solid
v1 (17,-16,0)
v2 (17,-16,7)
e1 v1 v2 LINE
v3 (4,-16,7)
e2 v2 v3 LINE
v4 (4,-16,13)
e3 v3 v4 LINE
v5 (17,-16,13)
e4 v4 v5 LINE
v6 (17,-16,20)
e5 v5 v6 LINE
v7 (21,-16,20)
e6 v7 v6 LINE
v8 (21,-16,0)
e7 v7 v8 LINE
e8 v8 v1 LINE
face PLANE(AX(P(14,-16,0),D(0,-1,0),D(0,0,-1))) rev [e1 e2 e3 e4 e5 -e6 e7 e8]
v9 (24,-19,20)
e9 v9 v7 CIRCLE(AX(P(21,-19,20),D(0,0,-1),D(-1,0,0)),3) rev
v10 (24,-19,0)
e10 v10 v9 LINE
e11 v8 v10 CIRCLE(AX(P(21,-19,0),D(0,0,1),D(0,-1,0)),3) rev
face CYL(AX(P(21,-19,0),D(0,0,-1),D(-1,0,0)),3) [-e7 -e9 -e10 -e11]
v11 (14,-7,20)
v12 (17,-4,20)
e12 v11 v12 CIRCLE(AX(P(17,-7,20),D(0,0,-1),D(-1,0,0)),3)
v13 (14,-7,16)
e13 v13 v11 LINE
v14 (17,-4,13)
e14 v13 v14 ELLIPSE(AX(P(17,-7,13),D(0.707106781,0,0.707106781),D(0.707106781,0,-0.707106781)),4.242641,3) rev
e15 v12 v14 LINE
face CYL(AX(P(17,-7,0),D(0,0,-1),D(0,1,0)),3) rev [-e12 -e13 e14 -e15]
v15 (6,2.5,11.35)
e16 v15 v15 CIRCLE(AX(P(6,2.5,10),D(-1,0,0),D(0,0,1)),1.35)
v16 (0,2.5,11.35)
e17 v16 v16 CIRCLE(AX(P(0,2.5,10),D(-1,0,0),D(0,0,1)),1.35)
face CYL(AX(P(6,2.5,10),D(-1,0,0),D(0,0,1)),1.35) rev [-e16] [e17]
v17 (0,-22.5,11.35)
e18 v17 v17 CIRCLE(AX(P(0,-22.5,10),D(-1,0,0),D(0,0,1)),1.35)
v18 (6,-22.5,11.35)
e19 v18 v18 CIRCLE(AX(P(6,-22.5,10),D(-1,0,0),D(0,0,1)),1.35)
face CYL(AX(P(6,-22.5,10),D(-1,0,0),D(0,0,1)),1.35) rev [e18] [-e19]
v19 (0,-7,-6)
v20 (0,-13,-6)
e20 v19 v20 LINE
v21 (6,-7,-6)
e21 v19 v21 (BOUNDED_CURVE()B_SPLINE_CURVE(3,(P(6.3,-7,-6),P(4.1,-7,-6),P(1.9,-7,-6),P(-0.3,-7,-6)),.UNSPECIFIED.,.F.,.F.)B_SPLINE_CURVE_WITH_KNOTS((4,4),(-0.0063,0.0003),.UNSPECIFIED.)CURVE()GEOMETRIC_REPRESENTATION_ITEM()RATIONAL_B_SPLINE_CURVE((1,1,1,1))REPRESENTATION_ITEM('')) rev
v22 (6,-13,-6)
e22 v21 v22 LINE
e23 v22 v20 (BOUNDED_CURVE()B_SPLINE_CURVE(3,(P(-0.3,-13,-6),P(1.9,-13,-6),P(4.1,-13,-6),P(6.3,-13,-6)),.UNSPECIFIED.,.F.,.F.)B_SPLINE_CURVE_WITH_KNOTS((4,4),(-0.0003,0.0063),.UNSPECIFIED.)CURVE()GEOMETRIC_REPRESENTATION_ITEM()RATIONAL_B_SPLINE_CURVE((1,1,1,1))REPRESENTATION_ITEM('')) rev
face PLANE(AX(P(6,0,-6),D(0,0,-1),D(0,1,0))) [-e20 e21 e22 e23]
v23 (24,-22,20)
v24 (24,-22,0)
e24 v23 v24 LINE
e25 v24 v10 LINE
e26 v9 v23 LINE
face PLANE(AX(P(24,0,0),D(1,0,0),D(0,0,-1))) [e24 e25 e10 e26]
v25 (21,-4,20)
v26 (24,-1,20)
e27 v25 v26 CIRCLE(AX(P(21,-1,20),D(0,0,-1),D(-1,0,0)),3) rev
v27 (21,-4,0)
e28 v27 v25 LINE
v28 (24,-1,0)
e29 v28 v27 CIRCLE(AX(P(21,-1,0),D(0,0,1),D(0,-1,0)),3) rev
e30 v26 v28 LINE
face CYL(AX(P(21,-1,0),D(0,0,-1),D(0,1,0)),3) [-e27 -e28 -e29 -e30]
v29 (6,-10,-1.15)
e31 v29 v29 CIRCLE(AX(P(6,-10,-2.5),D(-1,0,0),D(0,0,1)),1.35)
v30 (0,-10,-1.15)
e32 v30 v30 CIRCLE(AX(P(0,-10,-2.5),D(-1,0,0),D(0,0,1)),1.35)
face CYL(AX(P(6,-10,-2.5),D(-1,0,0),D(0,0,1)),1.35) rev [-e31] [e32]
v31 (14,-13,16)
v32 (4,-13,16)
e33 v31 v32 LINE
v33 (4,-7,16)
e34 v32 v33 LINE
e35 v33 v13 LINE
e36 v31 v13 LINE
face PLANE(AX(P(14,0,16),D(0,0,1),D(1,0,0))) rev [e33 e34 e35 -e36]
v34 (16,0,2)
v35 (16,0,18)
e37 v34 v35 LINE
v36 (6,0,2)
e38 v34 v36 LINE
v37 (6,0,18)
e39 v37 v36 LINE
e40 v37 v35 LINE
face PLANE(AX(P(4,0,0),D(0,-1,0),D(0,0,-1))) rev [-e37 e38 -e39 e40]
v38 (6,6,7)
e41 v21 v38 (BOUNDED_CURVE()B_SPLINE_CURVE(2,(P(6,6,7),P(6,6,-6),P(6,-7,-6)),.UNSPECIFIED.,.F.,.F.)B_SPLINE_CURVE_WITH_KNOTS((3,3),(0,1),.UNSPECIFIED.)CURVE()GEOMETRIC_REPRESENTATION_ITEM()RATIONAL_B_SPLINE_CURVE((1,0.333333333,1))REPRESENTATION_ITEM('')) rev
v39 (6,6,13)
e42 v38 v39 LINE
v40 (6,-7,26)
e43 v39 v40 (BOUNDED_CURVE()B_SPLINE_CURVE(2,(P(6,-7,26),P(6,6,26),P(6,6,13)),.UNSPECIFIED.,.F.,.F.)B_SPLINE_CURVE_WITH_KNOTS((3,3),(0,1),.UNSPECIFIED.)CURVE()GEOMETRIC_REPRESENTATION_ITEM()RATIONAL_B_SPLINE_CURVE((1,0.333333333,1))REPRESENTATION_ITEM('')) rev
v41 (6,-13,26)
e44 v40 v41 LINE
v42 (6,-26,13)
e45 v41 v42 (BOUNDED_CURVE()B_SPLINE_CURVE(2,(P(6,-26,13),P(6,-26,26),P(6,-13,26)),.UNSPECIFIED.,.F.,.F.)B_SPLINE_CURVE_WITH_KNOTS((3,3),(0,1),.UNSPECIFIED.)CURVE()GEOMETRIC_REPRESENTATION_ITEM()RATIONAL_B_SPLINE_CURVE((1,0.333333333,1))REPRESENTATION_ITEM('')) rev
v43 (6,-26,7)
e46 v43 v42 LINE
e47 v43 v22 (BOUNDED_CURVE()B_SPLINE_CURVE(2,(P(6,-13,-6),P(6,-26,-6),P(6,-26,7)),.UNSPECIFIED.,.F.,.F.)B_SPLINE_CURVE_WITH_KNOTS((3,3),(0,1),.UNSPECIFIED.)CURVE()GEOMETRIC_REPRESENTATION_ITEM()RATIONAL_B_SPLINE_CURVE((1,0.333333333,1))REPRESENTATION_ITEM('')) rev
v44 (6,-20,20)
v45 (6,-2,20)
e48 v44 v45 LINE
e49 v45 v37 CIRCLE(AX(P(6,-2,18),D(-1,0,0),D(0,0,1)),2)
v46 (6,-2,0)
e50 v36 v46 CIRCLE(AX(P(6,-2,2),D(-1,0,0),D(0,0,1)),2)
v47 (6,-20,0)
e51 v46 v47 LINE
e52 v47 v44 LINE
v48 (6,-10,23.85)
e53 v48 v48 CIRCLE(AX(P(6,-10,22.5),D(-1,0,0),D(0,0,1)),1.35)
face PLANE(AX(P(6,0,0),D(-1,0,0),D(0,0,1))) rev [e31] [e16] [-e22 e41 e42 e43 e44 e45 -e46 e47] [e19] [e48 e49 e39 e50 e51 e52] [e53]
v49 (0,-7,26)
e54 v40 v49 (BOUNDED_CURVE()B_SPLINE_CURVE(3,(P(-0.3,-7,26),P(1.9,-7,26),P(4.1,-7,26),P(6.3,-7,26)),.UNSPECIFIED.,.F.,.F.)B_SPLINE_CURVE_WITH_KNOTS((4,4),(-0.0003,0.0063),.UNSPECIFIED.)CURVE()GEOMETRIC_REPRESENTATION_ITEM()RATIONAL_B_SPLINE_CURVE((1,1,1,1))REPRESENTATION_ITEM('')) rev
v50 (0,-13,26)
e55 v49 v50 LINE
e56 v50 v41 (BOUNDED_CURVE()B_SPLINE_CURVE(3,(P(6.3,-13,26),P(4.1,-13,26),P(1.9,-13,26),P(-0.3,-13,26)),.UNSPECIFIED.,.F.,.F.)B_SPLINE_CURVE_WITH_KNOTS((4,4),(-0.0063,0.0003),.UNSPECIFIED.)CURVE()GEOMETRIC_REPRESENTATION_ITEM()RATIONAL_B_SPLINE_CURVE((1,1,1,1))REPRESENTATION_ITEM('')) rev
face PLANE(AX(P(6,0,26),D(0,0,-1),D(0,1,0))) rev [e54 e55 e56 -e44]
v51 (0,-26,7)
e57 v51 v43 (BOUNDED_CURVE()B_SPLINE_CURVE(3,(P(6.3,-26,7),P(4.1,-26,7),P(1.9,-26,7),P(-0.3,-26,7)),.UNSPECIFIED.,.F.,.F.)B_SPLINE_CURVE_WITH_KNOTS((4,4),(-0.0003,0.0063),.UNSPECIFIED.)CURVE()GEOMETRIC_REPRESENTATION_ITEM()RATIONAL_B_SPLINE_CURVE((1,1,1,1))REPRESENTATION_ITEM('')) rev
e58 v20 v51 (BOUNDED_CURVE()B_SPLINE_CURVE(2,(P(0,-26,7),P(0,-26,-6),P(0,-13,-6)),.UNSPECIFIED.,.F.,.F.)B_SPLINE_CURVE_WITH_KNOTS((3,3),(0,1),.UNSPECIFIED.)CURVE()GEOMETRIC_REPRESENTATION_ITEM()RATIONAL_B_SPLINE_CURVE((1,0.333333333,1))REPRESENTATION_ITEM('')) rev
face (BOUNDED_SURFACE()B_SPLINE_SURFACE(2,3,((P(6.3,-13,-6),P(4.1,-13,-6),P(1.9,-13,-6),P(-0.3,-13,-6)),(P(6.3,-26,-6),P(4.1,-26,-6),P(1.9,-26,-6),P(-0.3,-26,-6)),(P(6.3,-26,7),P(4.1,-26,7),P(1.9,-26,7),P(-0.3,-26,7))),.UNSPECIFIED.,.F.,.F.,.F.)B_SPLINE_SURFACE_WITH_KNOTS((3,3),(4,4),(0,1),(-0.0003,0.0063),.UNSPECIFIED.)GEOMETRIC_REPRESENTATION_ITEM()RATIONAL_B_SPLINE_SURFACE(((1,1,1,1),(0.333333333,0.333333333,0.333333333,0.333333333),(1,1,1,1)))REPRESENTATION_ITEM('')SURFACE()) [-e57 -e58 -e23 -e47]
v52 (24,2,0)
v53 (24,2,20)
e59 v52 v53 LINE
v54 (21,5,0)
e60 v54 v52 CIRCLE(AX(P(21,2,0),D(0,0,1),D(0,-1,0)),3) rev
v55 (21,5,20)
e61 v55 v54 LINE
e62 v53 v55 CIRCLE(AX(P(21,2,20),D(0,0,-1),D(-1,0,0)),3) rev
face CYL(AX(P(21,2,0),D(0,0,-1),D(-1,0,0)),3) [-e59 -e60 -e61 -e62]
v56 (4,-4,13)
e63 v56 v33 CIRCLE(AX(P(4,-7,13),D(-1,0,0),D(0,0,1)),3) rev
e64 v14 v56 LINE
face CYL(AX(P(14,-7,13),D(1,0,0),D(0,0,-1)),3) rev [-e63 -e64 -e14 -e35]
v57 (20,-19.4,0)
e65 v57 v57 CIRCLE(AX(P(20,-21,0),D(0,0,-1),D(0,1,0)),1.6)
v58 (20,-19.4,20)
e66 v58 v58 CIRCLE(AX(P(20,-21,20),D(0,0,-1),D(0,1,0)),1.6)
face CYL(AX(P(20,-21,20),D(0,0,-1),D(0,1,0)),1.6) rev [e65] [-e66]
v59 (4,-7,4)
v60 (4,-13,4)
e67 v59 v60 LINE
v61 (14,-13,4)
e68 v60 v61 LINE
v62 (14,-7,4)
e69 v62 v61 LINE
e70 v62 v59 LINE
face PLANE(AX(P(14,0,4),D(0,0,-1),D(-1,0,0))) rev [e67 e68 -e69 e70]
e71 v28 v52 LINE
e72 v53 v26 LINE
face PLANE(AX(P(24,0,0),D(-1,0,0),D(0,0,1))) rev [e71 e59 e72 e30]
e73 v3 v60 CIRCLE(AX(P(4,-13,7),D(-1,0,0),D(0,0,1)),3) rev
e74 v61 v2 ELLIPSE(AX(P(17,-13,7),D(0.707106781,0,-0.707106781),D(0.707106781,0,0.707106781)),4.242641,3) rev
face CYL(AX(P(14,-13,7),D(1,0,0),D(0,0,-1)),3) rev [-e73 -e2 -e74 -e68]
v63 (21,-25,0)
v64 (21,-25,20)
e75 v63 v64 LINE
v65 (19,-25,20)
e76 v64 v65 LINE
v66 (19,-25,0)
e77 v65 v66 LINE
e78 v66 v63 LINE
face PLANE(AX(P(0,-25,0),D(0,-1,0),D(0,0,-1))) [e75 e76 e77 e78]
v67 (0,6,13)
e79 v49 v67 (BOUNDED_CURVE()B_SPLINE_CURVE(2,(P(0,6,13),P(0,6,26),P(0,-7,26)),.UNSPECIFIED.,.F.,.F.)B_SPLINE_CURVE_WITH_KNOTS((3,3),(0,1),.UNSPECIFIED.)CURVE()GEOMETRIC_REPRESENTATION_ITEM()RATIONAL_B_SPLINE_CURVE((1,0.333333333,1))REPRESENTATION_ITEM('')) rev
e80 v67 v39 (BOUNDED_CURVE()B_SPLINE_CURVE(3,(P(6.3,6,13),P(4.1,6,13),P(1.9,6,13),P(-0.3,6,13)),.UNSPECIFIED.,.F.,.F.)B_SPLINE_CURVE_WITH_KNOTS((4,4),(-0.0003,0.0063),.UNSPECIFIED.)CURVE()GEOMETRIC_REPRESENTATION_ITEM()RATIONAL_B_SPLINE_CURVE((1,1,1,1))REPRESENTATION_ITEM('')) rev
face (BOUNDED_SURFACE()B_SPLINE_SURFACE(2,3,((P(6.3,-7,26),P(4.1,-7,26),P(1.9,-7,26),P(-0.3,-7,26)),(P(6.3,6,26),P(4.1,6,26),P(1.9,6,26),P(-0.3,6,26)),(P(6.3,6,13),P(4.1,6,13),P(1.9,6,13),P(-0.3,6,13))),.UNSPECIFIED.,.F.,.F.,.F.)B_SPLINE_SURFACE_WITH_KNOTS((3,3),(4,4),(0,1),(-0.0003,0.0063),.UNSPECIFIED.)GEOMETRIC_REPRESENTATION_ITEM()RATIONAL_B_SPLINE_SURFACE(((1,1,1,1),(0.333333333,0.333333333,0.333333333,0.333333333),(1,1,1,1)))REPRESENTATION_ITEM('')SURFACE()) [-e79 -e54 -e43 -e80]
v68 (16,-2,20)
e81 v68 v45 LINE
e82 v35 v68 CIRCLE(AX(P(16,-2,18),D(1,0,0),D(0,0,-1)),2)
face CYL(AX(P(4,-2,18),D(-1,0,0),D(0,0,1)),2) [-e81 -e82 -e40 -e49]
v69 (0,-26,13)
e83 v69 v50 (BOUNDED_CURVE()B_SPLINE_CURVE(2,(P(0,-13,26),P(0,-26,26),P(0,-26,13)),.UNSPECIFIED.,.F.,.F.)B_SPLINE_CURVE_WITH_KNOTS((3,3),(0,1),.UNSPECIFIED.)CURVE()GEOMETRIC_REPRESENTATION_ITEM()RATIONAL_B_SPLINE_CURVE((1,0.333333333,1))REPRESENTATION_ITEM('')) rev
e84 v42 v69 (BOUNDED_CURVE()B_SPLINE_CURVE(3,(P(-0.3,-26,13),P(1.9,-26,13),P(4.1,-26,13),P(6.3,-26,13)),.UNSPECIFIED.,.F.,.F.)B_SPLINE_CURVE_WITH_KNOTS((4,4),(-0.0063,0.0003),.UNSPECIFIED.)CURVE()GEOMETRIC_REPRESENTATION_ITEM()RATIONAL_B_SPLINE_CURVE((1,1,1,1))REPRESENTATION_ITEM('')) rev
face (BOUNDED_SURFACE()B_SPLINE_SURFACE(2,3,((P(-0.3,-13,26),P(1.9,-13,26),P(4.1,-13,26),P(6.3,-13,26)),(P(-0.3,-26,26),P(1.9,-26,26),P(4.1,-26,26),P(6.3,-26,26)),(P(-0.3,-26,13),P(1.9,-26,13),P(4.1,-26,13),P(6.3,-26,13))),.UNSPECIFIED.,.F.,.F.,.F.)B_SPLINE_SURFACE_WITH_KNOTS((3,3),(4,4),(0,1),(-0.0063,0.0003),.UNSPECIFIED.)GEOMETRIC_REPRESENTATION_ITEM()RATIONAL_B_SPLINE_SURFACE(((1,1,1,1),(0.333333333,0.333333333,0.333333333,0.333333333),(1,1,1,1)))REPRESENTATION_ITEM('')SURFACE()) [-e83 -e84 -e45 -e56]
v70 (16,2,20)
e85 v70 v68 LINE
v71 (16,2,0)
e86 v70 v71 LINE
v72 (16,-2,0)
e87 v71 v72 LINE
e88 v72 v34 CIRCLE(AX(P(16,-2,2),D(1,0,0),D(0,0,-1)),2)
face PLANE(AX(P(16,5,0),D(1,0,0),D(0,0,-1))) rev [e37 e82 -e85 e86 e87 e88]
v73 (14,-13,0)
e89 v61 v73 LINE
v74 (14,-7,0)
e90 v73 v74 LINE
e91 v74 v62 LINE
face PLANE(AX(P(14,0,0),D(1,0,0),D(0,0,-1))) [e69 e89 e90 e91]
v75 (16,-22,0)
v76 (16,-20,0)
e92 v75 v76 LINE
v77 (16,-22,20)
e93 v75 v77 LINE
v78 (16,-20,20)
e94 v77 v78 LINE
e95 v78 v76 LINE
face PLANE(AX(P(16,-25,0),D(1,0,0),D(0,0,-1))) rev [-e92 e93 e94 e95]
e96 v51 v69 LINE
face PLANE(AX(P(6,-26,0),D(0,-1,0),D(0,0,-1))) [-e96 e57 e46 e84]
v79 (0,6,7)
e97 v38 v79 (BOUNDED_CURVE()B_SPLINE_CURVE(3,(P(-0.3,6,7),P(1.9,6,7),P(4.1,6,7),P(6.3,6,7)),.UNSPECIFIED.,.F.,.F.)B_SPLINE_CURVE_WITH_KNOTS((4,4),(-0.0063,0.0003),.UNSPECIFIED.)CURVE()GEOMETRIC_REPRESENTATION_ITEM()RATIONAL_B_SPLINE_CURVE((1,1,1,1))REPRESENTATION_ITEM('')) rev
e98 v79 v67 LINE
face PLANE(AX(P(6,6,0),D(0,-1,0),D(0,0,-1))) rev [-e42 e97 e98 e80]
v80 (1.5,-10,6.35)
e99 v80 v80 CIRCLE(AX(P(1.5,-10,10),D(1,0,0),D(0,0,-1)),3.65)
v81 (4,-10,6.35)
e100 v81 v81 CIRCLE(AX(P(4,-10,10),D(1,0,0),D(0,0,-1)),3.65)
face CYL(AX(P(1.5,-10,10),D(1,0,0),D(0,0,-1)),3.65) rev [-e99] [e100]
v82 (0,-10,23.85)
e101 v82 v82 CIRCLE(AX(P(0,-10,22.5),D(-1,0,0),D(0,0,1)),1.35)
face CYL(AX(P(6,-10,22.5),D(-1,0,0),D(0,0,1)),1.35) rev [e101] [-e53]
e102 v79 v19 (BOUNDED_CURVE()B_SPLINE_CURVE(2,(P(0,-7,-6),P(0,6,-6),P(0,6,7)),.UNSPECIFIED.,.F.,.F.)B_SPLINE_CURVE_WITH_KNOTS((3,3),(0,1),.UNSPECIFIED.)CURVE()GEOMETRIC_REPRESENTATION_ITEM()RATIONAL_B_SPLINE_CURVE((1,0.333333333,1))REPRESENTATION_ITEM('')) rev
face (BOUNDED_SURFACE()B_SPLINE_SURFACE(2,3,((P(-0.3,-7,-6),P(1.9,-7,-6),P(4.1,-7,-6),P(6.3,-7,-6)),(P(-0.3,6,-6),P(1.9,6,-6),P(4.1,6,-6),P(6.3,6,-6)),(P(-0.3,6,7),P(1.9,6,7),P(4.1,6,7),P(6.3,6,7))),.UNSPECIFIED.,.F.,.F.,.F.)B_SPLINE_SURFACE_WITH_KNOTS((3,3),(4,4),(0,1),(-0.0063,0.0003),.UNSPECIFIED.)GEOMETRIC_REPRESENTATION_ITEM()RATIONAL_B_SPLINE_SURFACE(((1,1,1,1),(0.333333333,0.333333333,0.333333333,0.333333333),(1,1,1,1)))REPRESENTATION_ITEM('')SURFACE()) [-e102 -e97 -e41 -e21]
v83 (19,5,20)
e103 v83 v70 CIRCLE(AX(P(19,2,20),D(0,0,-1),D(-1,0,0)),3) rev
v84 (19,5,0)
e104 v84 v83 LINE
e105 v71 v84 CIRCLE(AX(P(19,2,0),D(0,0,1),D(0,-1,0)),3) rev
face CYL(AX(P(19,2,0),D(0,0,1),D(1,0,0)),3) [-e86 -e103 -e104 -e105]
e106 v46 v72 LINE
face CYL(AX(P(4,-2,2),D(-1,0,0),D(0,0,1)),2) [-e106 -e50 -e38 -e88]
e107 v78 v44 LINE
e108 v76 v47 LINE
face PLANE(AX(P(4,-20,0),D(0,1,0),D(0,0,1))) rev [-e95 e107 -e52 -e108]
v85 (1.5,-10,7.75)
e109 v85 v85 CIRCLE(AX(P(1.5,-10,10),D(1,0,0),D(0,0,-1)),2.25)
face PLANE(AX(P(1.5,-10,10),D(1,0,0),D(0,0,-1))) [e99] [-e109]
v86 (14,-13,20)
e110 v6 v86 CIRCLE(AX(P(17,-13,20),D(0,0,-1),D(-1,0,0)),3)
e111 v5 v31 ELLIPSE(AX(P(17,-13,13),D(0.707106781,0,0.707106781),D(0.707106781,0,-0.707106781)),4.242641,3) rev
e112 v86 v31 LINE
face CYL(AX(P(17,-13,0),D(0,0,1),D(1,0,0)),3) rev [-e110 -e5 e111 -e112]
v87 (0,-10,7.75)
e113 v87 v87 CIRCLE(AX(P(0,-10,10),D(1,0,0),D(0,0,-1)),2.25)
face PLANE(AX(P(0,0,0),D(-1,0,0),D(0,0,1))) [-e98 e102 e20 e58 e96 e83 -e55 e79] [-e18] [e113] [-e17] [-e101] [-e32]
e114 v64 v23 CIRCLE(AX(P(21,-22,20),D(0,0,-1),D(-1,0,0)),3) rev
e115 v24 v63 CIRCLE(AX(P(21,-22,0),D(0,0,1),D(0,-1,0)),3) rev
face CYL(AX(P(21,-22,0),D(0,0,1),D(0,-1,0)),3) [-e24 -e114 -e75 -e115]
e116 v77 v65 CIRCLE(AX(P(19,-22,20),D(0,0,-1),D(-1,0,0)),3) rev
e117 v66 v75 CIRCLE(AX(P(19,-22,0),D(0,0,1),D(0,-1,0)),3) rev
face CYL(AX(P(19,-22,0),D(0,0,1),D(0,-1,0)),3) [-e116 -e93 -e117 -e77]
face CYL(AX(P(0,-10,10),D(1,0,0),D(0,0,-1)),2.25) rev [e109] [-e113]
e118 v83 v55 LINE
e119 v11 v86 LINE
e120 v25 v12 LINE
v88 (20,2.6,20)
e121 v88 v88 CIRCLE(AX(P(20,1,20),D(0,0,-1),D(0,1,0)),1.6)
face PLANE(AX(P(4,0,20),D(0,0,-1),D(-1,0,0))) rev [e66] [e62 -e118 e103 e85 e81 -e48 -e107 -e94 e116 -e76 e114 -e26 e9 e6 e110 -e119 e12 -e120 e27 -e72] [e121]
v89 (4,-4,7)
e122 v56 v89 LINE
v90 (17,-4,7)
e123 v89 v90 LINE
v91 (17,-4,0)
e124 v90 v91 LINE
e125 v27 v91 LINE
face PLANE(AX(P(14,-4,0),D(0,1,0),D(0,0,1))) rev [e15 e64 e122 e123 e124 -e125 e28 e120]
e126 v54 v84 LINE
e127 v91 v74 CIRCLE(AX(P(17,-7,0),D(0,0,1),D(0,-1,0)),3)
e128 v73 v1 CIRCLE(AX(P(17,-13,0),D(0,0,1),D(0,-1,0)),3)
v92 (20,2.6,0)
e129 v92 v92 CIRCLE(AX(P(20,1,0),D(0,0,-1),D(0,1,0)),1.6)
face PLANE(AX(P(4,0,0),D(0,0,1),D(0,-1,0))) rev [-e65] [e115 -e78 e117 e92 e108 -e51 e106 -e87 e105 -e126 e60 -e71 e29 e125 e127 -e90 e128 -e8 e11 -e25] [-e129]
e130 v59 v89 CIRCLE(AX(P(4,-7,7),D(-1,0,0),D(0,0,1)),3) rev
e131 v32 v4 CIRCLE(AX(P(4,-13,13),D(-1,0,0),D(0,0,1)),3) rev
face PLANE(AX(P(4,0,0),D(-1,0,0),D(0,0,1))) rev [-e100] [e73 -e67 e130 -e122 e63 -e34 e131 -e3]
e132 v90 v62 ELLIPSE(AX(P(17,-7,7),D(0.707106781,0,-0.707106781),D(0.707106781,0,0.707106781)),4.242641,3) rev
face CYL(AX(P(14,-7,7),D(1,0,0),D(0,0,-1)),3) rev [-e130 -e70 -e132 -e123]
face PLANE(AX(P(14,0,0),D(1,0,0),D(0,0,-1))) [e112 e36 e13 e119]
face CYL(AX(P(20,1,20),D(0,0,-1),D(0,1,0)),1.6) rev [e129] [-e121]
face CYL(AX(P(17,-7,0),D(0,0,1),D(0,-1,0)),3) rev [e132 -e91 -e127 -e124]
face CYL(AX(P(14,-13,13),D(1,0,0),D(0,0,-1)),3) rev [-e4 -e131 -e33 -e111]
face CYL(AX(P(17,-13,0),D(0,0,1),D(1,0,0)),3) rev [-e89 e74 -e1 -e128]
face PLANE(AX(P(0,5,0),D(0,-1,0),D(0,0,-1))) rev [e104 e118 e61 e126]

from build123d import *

# Parameters (mm, degrees)
SKETCH1_W           = 20
SKETCH1_H           = 20
BOSS_EXTRUDE1_DEPTH = 4
SKETCH2_R           = 3.65
CUT_EXTRUDE1_DEPTH  = 2.5
SKETCH3_R           = 2.25
CUT_EXTRUDE2_DEPTH  = 29.394541729
SKETCH4_W           = 12
SKETCH4_H           = 4
BOSS_EXTRUDE2_DEPTH = 10
SKETCH7_W           = 20
SKETCH7_H           = 4
BOSS_EXTRUDE3_DEPTH = 10
SKETCH8_W           = 8
SKETCH8_H           = 20
BOSS_EXTRUDE4_DEPTH = 5
SKETCH9_W           = 8
SKETCH9_H           = 20
BOSS_EXTRUDE5_DEPTH = 5
SKETCH10_R          = 1.6
CUT_EXTRUDE5_DEPTH  = 41.012498047
SKETCH11_W          = 32
SKETCH11_H          = 32
SKETCH11_W_2        = 20
SKETCH11_H_2        = 20
BOSS_EXTRUDE6_DEPTH = 6
FILLET6_R           = 3
SKETCH13_R          = 1.35
CUT_EXTRUDE7_DEPTH  = 6
FILLET7_R           = 3
FILLET13_R          = 2
FILLET14_SIZE       = 13


with BuildPart() as part:
    # Sketch1 → Boss-Extrude1 (new body)
    with BuildSketch(Plane(origin=(0, 0, 0), x_dir=(0, 0, -1), z_dir=(1, 0, 0))):
        with Locations((-10, -10)):
            Rectangle(SKETCH1_W, SKETCH1_H)
    extrude(amount=BOSS_EXTRUDE1_DEPTH)

    # Sketch2 → Cut-Extrude1 (cut)
    with BuildSketch(Plane(origin=(4, 0, 0), x_dir=(0, 0, -1), z_dir=(1, 0, 0))):
        with Locations((-10, -10)):
            Circle(SKETCH2_R)
    extrude(amount=-CUT_EXTRUDE1_DEPTH, mode=Mode.SUBTRACT)

    # Sketch3 → Cut-Extrude2 (cut, through all)
    with BuildSketch(Plane(origin=(1.5, 0, 0), x_dir=(0, 0, -1), z_dir=(1, 0, 0))):
        with Locations((-10, -10)):
            Circle(SKETCH3_R)
    extrude(amount=-CUT_EXTRUDE2_DEPTH, mode=Mode.SUBTRACT)

    # Sketch4 → Boss-Extrude2 (add)
    with BuildSketch(Plane(origin=(4, 0, 0), x_dir=(0, 0, -1), z_dir=(1, 0, 0))):
        Polygon((-20, 0), (-20, -20), (-16, -20), (-16, -16), (-16, -4), (-16, 0), align=None)
        with Locations((-10, -18)):
            Rectangle(SKETCH4_W, SKETCH4_H)
        Polygon((-4, -16), (-4, -20), (0, -20), (0, -4), (-4, -4), align=None)
        Polygon((0, 0), (-16, 0), (-16, -4), (-4, -4), (0, -4), align=None)
    extrude(amount=BOSS_EXTRUDE2_DEPTH)

    # Sketch7 → Boss-Extrude3 (add)
    with BuildSketch(Plane(origin=(14, 0, 0), x_dir=(0, 0, -1), z_dir=(1, 0, 0))):
        with Locations((-10, -18)):
            Rectangle(SKETCH7_W, SKETCH7_H)
        with Locations((-10, -2)):
            Rectangle(SKETCH7_W, SKETCH7_H)
    extrude(amount=BOSS_EXTRUDE3_DEPTH)

    # Sketch8 → Boss-Extrude4 (add)
    with BuildSketch(Plane(origin=(0, -20, 0), x_dir=(-1, 0, 0), z_dir=(0, -1, 0))):
        with Locations((-20, -10)):
            Rectangle(SKETCH8_W, SKETCH8_H)
    extrude(amount=BOSS_EXTRUDE4_DEPTH)

    # Sketch9 → Boss-Extrude5 (add)
    with BuildSketch(Plane(origin=(0, 0, 0), x_dir=(1, 0, 0), z_dir=(0, 1, 0))):
        with Locations((20, -10)):
            Rectangle(SKETCH9_W, SKETCH9_H)
    extrude(amount=BOSS_EXTRUDE5_DEPTH)

    # Sketch10 → Cut-Extrude5 (cut, through all)
    with BuildSketch(Plane(origin=(0, 0, 0), x_dir=(-1, 0, 0), z_dir=(0, 0, -1))):
        with Locations(Location((-20, 1, 0), (0, 0, 90))):
            Circle(SKETCH10_R)
        with Locations(Location((-20, -21, 0), (0, 0, 90))):
            Circle(SKETCH10_R)
    extrude(amount=-CUT_EXTRUDE5_DEPTH, mode=Mode.SUBTRACT)

    # Sketch11 → Boss-Extrude6 (add)
    with BuildSketch(Plane.ZY):
        with Locations((10, -10)):
            Rectangle(SKETCH11_W, SKETCH11_H)
        with Locations((10, -10)):
            Rectangle(SKETCH11_W_2, SKETCH11_H_2, mode=Mode.SUBTRACT)
    extrude(amount=-BOSS_EXTRUDE6_DEPTH)

    # Fillet6
    fillet6_edges = [part.edges().sort_by_distance(p)[0] for p in [
        (24, -16, 10),
        (24, -4, 10),
        (24, -25, 10),
        (16, -25, 10),
        (24, 5, 10),
        (16, 5, 10),
    ]]
    fillet(fillet6_edges, radius=FILLET6_R)

    # Sketch13 → Cut-Extrude7 (cut)
    with BuildSketch(Plane.ZY):
        with Locations((22.5, -10)):
            Circle(SKETCH13_R)
        with Locations((10, 2.5)):
            Circle(SKETCH13_R)
        with Locations((-2.5, -10)):
            Circle(SKETCH13_R)
        with Locations((10, -22.5)):
            Circle(SKETCH13_R)
    extrude(amount=-CUT_EXTRUDE7_DEPTH, mode=Mode.SUBTRACT)

    # Fillet7
    fillet7_edges = [part.edges().sort_by_distance(p)[0] for p in [
        (9, -4, 16),
        (9, -4, 4),
        (9, -16, 4),
        (9, -16, 16),
        (14, -16, 18),
        (14, -16, 2),
        (14, -4, 2),
        (14, -4, 18),
    ]]
    fillet(fillet7_edges, radius=FILLET7_R)

    # Fillet13
    fillet13_edges = [part.edges().sort_by_distance(p)[0] for p in [
        (11, 0, 20),
        (11, 0, 0),
    ]]
    fillet(fillet13_edges, radius=FILLET13_R)

    # Fillet14
    # a fillet whose section is not a circle: 13 mm, written as the material it takes off along each edge
    with BuildSketch(Plane(origin=(0, -26, -6), x_dir=(0, 1, 0), z_dir=(1, 0, 0)), Plane(origin=(0, -26, 26), x_dir=(0, 0, -1), z_dir=(1, 0, 0))) as fillet14_piece_1:
        with BuildLine():
            Bezier((FILLET14_SIZE, 0), (0, 0), (0, FILLET14_SIZE), weights=[1, 0.333333333, 1])
            Line((0, FILLET14_SIZE), (-FILLET14_SIZE * 0.02, FILLET14_SIZE))
            Line((-FILLET14_SIZE * 0.02, FILLET14_SIZE), (-FILLET14_SIZE * 0.02, -FILLET14_SIZE * 0.02))
            Line((-FILLET14_SIZE * 0.02, -FILLET14_SIZE * 0.02), (FILLET14_SIZE, -FILLET14_SIZE * 0.02))
            Line((FILLET14_SIZE, -FILLET14_SIZE * 0.02), (FILLET14_SIZE, 0))
        make_face()
    extrude(amount=6, mode=Mode.SUBTRACT)
    with BuildSketch(Plane(origin=(0, 6, -6), x_dir=(0, -1, 0), z_dir=(1, 0, 0)), Plane(origin=(0, 6, 26), x_dir=(0, 0, -1), z_dir=(1, 0, 0))) as fillet14_piece_2:
        with BuildLine():
            Bezier((FILLET14_SIZE, 0), (0, 0), (0, -FILLET14_SIZE), weights=[1, 0.333333333, 1])
            Line((0, -FILLET14_SIZE), (-FILLET14_SIZE * 0.02, -FILLET14_SIZE))
            Line((-FILLET14_SIZE * 0.02, -FILLET14_SIZE), (-FILLET14_SIZE * 0.02, FILLET14_SIZE * 0.02))
            Line((-FILLET14_SIZE * 0.02, FILLET14_SIZE * 0.02), (FILLET14_SIZE, FILLET14_SIZE * 0.02))
            Line((FILLET14_SIZE, FILLET14_SIZE * 0.02), (FILLET14_SIZE, 0))
        make_face()
    extrude(amount=6, mode=Mode.SUBTRACT)


solid = part.part
